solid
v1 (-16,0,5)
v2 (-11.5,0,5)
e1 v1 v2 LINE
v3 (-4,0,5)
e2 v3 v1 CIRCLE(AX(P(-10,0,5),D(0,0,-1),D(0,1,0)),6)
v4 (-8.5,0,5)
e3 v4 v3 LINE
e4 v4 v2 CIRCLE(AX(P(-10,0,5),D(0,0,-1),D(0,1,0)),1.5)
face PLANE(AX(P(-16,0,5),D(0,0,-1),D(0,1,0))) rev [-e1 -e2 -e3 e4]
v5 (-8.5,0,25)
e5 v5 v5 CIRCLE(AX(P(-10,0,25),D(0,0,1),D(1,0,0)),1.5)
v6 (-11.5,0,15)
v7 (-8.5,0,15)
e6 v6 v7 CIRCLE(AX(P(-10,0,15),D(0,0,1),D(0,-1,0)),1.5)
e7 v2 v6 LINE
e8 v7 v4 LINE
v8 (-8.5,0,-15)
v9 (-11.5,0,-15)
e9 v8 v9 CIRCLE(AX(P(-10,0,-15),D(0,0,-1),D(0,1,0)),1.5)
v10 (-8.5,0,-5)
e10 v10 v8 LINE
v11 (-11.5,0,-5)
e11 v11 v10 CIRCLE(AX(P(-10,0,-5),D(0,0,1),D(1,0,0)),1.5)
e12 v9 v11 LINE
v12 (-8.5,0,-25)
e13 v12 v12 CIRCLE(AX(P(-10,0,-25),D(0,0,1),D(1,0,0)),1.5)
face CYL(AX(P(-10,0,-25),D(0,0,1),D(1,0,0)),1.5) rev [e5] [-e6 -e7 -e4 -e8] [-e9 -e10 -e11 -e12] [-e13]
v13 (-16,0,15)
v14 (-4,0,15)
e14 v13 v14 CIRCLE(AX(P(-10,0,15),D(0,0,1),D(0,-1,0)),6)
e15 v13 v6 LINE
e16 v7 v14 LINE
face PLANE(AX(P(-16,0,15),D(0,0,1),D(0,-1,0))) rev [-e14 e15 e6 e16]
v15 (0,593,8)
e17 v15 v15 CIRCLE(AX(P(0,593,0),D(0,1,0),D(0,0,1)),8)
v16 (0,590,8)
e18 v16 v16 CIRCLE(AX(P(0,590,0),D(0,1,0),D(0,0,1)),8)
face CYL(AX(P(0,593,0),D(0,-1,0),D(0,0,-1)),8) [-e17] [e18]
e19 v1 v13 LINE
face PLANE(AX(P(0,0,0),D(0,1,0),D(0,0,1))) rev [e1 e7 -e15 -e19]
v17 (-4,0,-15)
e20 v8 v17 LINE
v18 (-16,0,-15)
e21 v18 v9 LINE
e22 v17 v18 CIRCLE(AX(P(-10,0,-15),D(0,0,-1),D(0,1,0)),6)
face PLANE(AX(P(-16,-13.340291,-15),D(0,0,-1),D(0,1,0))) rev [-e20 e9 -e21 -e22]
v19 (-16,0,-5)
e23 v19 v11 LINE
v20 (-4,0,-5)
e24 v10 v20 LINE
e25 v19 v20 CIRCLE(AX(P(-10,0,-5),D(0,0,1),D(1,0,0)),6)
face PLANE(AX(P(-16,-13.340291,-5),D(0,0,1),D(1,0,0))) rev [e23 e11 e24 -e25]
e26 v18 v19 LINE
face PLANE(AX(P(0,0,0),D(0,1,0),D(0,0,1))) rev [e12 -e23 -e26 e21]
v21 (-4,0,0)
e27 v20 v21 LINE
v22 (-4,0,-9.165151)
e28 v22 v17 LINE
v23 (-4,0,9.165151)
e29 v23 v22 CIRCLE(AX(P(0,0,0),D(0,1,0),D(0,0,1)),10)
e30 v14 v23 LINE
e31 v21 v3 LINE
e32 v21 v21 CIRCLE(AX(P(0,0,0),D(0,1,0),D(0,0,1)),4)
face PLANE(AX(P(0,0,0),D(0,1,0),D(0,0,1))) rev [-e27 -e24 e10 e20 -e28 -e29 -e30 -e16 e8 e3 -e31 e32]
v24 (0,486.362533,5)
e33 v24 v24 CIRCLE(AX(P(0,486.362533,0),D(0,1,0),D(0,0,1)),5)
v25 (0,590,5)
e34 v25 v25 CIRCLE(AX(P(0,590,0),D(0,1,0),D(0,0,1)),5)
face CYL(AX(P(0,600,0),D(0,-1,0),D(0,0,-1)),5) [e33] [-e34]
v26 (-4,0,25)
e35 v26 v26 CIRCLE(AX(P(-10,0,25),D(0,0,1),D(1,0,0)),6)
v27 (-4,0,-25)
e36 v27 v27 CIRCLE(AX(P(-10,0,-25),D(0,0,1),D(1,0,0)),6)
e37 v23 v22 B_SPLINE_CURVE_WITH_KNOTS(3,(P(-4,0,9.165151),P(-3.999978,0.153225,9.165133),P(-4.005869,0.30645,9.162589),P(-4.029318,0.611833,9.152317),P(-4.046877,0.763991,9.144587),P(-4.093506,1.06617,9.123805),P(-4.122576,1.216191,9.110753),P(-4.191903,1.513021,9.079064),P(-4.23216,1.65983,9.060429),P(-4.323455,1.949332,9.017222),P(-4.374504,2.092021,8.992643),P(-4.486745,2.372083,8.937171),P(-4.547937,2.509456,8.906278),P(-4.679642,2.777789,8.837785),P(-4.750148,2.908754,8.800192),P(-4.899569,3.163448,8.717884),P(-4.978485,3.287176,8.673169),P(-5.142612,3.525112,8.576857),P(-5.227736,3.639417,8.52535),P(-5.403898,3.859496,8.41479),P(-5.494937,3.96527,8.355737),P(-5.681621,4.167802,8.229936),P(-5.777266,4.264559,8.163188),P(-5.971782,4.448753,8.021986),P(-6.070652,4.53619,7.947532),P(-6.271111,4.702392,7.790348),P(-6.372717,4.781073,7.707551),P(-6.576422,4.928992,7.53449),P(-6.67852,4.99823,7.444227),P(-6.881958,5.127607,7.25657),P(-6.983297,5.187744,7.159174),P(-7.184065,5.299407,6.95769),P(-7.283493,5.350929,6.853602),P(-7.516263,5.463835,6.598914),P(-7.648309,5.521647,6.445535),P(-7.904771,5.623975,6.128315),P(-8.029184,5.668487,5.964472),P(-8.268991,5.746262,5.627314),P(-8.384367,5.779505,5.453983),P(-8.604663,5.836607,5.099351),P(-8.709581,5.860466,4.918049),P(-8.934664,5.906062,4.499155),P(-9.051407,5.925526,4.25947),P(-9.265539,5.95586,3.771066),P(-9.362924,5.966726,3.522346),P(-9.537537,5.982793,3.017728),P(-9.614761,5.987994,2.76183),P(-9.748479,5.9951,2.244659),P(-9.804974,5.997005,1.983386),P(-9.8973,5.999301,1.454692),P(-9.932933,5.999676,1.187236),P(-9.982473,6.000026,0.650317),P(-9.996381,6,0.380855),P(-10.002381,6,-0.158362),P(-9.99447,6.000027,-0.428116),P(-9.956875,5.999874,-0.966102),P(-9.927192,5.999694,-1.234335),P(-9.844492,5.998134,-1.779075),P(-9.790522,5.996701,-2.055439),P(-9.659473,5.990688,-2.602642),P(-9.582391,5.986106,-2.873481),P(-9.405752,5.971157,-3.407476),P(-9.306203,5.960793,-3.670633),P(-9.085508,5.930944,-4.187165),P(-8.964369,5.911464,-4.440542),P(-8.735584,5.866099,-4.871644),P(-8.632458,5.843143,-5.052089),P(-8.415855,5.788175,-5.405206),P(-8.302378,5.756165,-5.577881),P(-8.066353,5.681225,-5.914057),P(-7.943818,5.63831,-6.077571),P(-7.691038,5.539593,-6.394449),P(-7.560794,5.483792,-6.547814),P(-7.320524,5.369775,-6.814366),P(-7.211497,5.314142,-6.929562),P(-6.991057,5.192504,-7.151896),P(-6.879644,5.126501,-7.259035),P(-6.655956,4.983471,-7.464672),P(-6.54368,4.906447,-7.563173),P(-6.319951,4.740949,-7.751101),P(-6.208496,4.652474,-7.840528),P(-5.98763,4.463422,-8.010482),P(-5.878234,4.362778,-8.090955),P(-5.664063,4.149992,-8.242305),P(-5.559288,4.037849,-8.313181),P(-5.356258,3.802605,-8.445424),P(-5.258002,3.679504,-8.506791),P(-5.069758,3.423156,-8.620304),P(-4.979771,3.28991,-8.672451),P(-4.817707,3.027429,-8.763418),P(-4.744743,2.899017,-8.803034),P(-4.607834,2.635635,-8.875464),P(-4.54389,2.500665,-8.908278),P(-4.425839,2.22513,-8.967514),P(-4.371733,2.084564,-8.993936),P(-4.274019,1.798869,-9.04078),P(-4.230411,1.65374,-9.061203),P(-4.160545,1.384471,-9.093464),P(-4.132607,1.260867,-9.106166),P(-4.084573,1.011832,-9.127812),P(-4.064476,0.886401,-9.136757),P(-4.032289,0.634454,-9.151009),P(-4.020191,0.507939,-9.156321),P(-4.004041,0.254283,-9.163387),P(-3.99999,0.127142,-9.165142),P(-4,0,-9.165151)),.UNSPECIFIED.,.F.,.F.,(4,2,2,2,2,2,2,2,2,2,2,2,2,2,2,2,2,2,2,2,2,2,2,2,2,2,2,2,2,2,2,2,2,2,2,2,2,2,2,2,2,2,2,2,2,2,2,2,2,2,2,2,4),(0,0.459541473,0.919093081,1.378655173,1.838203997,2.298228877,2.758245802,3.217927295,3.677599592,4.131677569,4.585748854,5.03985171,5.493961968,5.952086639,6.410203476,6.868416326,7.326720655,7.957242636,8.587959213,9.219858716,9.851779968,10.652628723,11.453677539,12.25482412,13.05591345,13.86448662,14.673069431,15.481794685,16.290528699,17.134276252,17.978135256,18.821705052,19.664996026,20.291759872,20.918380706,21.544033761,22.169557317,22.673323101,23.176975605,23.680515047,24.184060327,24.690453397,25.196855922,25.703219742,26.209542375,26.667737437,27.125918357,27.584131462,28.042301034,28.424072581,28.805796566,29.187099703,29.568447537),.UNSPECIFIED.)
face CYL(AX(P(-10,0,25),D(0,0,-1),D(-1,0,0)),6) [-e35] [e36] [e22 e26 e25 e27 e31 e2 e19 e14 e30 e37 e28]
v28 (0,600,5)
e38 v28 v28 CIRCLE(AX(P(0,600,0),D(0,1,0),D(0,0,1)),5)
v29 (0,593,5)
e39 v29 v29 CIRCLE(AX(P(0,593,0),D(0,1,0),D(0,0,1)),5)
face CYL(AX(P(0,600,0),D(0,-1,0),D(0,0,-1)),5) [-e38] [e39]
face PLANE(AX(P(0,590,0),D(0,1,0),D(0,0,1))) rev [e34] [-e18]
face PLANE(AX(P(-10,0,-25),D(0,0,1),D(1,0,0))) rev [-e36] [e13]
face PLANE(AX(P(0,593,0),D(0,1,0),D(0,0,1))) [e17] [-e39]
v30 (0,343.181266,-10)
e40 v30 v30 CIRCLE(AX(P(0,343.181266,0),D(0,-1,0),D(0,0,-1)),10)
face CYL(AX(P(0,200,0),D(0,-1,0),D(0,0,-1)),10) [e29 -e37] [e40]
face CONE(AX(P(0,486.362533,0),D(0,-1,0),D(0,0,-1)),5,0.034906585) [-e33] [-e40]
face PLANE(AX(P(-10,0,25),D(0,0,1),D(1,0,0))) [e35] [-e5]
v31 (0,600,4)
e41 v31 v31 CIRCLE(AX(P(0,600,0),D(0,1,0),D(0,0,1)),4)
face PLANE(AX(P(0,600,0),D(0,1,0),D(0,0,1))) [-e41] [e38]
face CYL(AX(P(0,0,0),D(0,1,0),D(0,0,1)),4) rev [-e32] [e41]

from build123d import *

# Parameters (mm, degrees)
ESQUISSE1_R                  = 5
BOSS_EXTRU_1_DEPTH           = 600
ESQUISSE2_R                  = 10
BOSS_EXTRU_2_DEPTH           = 200
CHANFREIN1_SIZE              = 10
CHANFREIN1_SIZE_2            = 286.362532829
ESQUISSE3_R                  = 4
ENL_V_MAT_EXTRU_1_DEPTH      = 601.166643525
ESQUISSE4_R                  = 8
ESQUISSE4_R_2                = 4.5
BOSS_EXTRU_3_DEPTH           = 3
ESQUISSE5_R                  = 6
BOSS_EXTRU_4_DEPTH           = 25
ENL_V_MAT_EXTRU_2_DEPTH      = 601.733718055
ENL_V_MAT_EXTRU_2_DEPTH_BACK = 601.733718055
ESQUISSE6_W                  = 10
ESQUISSE6_H                  = 13.340291415
ESQUISSE7_R                  = 1.5
ENL_V_MAT_EXTRU_3_DEPTH      = 603.292287858


with BuildPart() as part:
    # Esquisse1 → Boss.-Extru.1 (new body)
    with BuildSketch(Plane(origin=(0, 0, 0), x_dir=(1, 0, 0), z_dir=(0, 1, 0))):
        with Locations(Location((0, 0, 0), (0, 0, 270))):
            Circle(ESQUISSE1_R)
    extrude(amount=BOSS_EXTRU_1_DEPTH)

    # Esquisse2 → Boss.-Extru.2 (add)
    with BuildSketch(Plane(origin=(0, 0, 0), x_dir=(1, 0, 0), z_dir=(0, 1, 0))):
        with Locations(Location((0, 0, 0), (0, 0, 90))):
            Circle(ESQUISSE2_R)
    extrude(amount=BOSS_EXTRU_2_DEPTH)

    # Chanfrein1
    # the kernel refuses this chamfer: 286.362532829, 10 mm, written as the material it adds along each edge
    with BuildSketch(Plane(origin=(0, 200, 0), x_dir=(0, 0, 1), z_dir=(1, 0, 0))) as chanfrein1_piece_1_section:
        Polygon((5 + CHANFREIN1_SIZE, 0), (5, -CHANFREIN1_SIZE_2), (5, 0), align=None)
    chanfrein1_piece_1 = revolve(axis=Axis((0, 200, 0), (0, -1, 0)), mode=Mode.PRIVATE)
    chanfrein1_piece_1 = chanfrein1_piece_1 & Plane(origin=(0, 318.034394442, 0), x_dir=(0, 0, -1), z_dir=(0, -1, 0)) * Cylinder(10, 1146, mode=Mode.PRIVATE)
    add(chanfrein1_piece_1)

    # Esquisse3 → Enlèv. mat.-Extru.1 (cut, through all)
    with BuildSketch(Plane(origin=(0, 600, 0), x_dir=(1, 0, 0), z_dir=(0, 1, 0))):
        with Locations(Location((0, 0, 0), (0, 0, 270))):
            Circle(ESQUISSE3_R)
    extrude(amount=-ENL_V_MAT_EXTRU_1_DEPTH, mode=Mode.SUBTRACT)

    # Esquisse4 → Boss.-Extru.3 (add)
    with BuildSketch(Plane(origin=(0, 590, 0), x_dir=(1, 0, 0), z_dir=(0, 1, 0))):
        with Locations(Location((0, 0, 0), (0, 0, 270))):
            Circle(ESQUISSE4_R)
        Circle(ESQUISSE4_R_2, mode=Mode.SUBTRACT)
    extrude(amount=BOSS_EXTRU_3_DEPTH)

    # Esquisse5 → Boss.-Extru.4 (add, symmetric)
    with BuildSketch(Plane.XY):
        with Locations((-10, 0)):
            Circle(ESQUISSE5_R)
    extrude(amount=BOSS_EXTRU_4_DEPTH, both=True)

    # Esquisse6 → Enlèv. mat.-Extru.2 (cut, two sides: drawn at the far end of the back side and taken through both)
    with BuildSketch(Plane(origin=(0, 0, 0), x_dir=(0, 0, -1), z_dir=(1, 0, 0)).offset(-ENL_V_MAT_EXTRU_2_DEPTH_BACK)):
        with Locations((-10, -6.670145708)):
            Rectangle(ESQUISSE6_W, ESQUISSE6_H)
        with Locations((10, -6.670145708)):
            Rectangle(ESQUISSE6_W, ESQUISSE6_H)
    extrude(amount=ENL_V_MAT_EXTRU_2_DEPTH + ENL_V_MAT_EXTRU_2_DEPTH_BACK, mode=Mode.SUBTRACT)

    # Esquisse7 → Enlèv. mat.-Extru.3 (cut, through all)
    with BuildSketch(Plane.XY.offset(25)):
        with Locations((-10, 0)):
            Circle(ESQUISSE7_R)
    extrude(amount=-ENL_V_MAT_EXTRU_3_DEPTH, mode=Mode.SUBTRACT)


solid = part.part
